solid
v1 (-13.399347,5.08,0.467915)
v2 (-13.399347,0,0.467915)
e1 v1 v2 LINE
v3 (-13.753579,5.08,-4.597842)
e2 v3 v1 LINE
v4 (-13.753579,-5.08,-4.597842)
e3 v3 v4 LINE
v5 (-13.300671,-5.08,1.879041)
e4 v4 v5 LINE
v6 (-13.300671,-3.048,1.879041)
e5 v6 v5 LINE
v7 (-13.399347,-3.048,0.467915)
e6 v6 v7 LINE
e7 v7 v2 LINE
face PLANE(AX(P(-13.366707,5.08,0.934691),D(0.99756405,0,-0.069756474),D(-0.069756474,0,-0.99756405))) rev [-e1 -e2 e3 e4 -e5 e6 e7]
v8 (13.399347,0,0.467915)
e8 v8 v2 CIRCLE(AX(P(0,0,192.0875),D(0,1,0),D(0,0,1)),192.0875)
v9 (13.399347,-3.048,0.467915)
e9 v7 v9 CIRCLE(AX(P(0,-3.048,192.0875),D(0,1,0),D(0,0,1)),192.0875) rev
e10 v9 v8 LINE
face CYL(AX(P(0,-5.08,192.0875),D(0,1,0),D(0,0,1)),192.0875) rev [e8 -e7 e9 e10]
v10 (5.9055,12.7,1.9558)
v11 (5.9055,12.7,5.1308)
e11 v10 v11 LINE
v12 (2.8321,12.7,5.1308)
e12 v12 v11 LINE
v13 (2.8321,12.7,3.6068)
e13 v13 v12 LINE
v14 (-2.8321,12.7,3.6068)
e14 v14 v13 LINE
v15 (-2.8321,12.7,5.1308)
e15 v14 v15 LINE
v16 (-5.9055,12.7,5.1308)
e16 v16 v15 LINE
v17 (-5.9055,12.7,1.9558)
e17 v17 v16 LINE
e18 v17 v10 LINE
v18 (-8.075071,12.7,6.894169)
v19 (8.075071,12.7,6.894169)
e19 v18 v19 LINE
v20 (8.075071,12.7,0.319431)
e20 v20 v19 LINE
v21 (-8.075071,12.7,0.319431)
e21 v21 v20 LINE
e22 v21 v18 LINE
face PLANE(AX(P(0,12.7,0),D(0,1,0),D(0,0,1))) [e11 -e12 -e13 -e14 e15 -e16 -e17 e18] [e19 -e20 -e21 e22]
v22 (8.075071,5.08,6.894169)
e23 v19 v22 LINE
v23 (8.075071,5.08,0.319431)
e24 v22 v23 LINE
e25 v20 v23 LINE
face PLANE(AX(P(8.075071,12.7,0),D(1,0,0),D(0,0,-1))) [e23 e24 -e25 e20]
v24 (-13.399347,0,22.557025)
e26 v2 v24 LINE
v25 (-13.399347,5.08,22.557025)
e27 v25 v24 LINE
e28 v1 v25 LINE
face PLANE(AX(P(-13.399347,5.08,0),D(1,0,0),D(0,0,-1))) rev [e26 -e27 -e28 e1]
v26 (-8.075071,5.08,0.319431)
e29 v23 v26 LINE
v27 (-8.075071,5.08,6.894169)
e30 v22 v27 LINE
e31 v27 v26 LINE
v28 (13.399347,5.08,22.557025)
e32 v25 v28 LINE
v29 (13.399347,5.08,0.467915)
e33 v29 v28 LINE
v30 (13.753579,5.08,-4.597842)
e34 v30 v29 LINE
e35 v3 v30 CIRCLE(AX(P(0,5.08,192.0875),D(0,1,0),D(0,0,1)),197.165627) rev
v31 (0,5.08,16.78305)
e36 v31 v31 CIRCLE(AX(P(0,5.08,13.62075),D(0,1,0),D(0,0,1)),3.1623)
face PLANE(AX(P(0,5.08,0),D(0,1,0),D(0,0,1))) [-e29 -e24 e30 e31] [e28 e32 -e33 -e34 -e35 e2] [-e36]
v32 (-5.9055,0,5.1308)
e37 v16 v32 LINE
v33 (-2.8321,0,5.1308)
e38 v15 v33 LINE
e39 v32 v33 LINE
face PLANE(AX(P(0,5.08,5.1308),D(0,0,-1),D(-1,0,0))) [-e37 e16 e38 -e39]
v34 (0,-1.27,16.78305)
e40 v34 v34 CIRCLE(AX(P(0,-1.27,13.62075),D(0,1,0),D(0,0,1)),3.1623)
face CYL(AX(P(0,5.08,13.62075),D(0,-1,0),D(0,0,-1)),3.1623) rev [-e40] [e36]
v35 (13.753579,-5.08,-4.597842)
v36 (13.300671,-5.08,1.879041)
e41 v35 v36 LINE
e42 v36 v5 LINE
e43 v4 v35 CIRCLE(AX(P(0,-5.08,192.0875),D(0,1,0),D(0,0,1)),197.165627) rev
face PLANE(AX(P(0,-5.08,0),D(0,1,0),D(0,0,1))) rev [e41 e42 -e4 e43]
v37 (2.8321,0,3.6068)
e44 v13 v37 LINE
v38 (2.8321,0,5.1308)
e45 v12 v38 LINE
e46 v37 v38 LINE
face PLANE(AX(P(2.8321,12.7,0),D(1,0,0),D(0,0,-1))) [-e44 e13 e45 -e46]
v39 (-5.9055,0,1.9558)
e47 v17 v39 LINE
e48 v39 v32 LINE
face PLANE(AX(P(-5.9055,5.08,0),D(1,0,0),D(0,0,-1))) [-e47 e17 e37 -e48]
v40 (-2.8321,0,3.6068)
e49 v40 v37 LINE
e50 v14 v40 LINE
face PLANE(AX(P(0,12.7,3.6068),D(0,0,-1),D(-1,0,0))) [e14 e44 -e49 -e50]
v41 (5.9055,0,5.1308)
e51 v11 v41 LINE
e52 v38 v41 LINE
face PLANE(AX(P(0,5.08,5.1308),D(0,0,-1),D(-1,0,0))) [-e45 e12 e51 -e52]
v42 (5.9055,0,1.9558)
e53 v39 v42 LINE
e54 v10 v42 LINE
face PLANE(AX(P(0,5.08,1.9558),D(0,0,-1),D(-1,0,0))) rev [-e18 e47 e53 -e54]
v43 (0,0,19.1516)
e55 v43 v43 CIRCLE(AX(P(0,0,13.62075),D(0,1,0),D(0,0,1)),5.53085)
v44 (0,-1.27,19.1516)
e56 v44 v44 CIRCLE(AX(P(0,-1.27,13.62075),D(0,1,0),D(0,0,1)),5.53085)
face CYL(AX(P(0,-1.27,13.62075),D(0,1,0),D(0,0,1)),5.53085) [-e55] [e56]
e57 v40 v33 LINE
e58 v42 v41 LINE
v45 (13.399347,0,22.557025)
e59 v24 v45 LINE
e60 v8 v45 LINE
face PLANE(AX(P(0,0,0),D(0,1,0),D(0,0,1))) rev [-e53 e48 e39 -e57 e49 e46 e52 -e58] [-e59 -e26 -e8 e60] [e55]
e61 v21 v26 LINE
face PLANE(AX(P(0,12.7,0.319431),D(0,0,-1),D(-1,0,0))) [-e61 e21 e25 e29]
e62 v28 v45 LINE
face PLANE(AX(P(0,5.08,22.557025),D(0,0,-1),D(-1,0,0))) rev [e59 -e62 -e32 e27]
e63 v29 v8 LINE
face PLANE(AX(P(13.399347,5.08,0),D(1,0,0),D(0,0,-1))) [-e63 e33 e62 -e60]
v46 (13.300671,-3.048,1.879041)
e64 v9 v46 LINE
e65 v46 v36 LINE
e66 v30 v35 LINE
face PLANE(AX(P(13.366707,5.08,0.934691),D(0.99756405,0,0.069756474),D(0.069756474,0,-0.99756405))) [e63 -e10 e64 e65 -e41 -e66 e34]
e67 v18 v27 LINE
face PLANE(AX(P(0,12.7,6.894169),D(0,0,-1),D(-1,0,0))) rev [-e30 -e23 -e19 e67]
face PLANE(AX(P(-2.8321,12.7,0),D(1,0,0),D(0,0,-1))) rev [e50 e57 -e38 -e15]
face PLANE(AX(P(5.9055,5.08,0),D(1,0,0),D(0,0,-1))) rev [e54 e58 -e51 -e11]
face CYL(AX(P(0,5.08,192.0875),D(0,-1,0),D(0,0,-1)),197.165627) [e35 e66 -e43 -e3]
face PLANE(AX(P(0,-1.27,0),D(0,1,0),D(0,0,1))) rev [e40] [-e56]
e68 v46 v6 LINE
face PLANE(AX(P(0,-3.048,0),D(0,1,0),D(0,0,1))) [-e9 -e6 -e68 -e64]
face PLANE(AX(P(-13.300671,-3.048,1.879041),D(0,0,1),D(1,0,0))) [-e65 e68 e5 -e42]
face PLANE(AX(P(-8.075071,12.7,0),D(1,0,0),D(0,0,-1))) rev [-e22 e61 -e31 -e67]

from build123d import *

# Parameters (mm, degrees)
SKETCH1_W           = 11.811
SKETCH1_H           = 3.175
SKETCH1_R           = 3.1623
BOSS_EXTRUDE1_DEPTH = 5.08
SKETCH1_3_W         = 16.150142566
SKETCH1_3_H         = 6.574737844
BOSS_EXTRUDE2_DEPTH = 12.7
BOSS_EXTRUDE3_START = -5.08
BOSS_EXTRUDE3_DEPTH = 5.08
BOSS_EXTRUDE5_DEPTH = 2.032
BOSS_EXTRUDE6_START = -1.27
SKETCH1_6_R         = 5.53085
SKETCH1_6_R_2       = 3.1623
BOSS_EXTRUDE6_DEPTH = 1.27


with BuildPart() as part:
    # Sketch1 → Boss-Extrude1 (new body)
    with BuildSketch(Plane(origin=(0, 0, 0), x_dir=(1, 0, 0), z_dir=(0, 1, 0))):
        with BuildLine():
            ThreePointArc((13.753578899, 4.597841674), (0, 5.078127233), (-13.753578899, 4.597841674))
            Line((-13.753578899, 4.597841674), (-13.39934665, -0.467915496))
            Line((-13.39934665, -0.467915496), (-13.39934665, -22.557024998))
            Line((-13.39934665, -22.557024998), (13.39934665, -22.557024998))
            Line((13.39934665, -22.557024998), (13.39934665, -0.467915496))
            Line((13.39934665, -0.467915496), (13.753578899, 4.597841674))
        make_face()
        with Locations((0, -3.5433)):
            Rectangle(SKETCH1_W, SKETCH1_H, mode=Mode.SUBTRACT)
        with Locations((0, -13.62075)):
            Circle(SKETCH1_R, mode=Mode.SUBTRACT)
    extrude(amount=BOSS_EXTRUDE1_DEPTH)

    # Sketch1<3> → Boss-Extrude2 (add)
    with BuildSketch(Plane(origin=(0, 0, 0), x_dir=(1, 0, 0), z_dir=(0, 1, 0))):
        with Locations((0, -3.6068)):
            Rectangle(SKETCH1_3_W, SKETCH1_3_H)
        Polygon((-2.8321, -3.6068), (-2.8321, -5.1308), (-5.9055, -5.1308), (-5.9055, -1.9558), (5.9055, -1.9558), (5.9055, -5.1308), (2.8321, -5.1308), (2.8321, -3.6068), align=None, mode=Mode.SUBTRACT)
    extrude(amount=BOSS_EXTRUDE2_DEPTH)

    # Sketch1<4> → Boss-Extrude3 (add)
    with BuildSketch(Plane(origin=(0, 0, 0), x_dir=(1, 0, 0), z_dir=(0, 1, 0)).offset(BOSS_EXTRUDE3_START)):
        with BuildLine():
            ThreePointArc((13.753578899, 4.597841674), (0, 5.078127233), (-13.753578899, 4.597841674))
            Line((-13.753578899, 4.597841674), (-13.39934665, -0.467915496))
            ThreePointArc((-13.39934665, -0.467915496), (-6.703757073, -0.117014515), (0, 0))
            ThreePointArc((0, 0), (6.703757073, -0.117014515), (13.39934665, -0.467915496))
            Line((13.39934665, -0.467915496), (13.753578899, 4.597841674))
        make_face()
    extrude(amount=BOSS_EXTRUDE3_DEPTH)

    # Sketch2 → Boss-Extrude5 (add)
    with BuildSketch(Plane.XZ.offset(5.08)):
        Polygon((-13.753578899, -4.597841674), (-13.39934665, 0.467915496), (-13.300671129, 1.879041191), (13.300671129, 1.879041191), (13.39934665, 0.467915496), (13.753578899, -4.597841674), align=None)
    extrude(amount=-BOSS_EXTRUDE5_DEPTH)

    # Sketch1<6> → Boss-Extrude6 (add)
    with BuildSketch(Plane(origin=(0, 0, 0), x_dir=(1, 0, 0), z_dir=(0, 1, 0)).offset(BOSS_EXTRUDE6_START)):
        with Locations((0, -13.62075)):
            Circle(SKETCH1_6_R)
        with Locations((0, -13.62075)):
            Circle(SKETCH1_6_R_2, mode=Mode.SUBTRACT)
    extrude(amount=BOSS_EXTRUDE6_DEPTH)


solid = part.part
